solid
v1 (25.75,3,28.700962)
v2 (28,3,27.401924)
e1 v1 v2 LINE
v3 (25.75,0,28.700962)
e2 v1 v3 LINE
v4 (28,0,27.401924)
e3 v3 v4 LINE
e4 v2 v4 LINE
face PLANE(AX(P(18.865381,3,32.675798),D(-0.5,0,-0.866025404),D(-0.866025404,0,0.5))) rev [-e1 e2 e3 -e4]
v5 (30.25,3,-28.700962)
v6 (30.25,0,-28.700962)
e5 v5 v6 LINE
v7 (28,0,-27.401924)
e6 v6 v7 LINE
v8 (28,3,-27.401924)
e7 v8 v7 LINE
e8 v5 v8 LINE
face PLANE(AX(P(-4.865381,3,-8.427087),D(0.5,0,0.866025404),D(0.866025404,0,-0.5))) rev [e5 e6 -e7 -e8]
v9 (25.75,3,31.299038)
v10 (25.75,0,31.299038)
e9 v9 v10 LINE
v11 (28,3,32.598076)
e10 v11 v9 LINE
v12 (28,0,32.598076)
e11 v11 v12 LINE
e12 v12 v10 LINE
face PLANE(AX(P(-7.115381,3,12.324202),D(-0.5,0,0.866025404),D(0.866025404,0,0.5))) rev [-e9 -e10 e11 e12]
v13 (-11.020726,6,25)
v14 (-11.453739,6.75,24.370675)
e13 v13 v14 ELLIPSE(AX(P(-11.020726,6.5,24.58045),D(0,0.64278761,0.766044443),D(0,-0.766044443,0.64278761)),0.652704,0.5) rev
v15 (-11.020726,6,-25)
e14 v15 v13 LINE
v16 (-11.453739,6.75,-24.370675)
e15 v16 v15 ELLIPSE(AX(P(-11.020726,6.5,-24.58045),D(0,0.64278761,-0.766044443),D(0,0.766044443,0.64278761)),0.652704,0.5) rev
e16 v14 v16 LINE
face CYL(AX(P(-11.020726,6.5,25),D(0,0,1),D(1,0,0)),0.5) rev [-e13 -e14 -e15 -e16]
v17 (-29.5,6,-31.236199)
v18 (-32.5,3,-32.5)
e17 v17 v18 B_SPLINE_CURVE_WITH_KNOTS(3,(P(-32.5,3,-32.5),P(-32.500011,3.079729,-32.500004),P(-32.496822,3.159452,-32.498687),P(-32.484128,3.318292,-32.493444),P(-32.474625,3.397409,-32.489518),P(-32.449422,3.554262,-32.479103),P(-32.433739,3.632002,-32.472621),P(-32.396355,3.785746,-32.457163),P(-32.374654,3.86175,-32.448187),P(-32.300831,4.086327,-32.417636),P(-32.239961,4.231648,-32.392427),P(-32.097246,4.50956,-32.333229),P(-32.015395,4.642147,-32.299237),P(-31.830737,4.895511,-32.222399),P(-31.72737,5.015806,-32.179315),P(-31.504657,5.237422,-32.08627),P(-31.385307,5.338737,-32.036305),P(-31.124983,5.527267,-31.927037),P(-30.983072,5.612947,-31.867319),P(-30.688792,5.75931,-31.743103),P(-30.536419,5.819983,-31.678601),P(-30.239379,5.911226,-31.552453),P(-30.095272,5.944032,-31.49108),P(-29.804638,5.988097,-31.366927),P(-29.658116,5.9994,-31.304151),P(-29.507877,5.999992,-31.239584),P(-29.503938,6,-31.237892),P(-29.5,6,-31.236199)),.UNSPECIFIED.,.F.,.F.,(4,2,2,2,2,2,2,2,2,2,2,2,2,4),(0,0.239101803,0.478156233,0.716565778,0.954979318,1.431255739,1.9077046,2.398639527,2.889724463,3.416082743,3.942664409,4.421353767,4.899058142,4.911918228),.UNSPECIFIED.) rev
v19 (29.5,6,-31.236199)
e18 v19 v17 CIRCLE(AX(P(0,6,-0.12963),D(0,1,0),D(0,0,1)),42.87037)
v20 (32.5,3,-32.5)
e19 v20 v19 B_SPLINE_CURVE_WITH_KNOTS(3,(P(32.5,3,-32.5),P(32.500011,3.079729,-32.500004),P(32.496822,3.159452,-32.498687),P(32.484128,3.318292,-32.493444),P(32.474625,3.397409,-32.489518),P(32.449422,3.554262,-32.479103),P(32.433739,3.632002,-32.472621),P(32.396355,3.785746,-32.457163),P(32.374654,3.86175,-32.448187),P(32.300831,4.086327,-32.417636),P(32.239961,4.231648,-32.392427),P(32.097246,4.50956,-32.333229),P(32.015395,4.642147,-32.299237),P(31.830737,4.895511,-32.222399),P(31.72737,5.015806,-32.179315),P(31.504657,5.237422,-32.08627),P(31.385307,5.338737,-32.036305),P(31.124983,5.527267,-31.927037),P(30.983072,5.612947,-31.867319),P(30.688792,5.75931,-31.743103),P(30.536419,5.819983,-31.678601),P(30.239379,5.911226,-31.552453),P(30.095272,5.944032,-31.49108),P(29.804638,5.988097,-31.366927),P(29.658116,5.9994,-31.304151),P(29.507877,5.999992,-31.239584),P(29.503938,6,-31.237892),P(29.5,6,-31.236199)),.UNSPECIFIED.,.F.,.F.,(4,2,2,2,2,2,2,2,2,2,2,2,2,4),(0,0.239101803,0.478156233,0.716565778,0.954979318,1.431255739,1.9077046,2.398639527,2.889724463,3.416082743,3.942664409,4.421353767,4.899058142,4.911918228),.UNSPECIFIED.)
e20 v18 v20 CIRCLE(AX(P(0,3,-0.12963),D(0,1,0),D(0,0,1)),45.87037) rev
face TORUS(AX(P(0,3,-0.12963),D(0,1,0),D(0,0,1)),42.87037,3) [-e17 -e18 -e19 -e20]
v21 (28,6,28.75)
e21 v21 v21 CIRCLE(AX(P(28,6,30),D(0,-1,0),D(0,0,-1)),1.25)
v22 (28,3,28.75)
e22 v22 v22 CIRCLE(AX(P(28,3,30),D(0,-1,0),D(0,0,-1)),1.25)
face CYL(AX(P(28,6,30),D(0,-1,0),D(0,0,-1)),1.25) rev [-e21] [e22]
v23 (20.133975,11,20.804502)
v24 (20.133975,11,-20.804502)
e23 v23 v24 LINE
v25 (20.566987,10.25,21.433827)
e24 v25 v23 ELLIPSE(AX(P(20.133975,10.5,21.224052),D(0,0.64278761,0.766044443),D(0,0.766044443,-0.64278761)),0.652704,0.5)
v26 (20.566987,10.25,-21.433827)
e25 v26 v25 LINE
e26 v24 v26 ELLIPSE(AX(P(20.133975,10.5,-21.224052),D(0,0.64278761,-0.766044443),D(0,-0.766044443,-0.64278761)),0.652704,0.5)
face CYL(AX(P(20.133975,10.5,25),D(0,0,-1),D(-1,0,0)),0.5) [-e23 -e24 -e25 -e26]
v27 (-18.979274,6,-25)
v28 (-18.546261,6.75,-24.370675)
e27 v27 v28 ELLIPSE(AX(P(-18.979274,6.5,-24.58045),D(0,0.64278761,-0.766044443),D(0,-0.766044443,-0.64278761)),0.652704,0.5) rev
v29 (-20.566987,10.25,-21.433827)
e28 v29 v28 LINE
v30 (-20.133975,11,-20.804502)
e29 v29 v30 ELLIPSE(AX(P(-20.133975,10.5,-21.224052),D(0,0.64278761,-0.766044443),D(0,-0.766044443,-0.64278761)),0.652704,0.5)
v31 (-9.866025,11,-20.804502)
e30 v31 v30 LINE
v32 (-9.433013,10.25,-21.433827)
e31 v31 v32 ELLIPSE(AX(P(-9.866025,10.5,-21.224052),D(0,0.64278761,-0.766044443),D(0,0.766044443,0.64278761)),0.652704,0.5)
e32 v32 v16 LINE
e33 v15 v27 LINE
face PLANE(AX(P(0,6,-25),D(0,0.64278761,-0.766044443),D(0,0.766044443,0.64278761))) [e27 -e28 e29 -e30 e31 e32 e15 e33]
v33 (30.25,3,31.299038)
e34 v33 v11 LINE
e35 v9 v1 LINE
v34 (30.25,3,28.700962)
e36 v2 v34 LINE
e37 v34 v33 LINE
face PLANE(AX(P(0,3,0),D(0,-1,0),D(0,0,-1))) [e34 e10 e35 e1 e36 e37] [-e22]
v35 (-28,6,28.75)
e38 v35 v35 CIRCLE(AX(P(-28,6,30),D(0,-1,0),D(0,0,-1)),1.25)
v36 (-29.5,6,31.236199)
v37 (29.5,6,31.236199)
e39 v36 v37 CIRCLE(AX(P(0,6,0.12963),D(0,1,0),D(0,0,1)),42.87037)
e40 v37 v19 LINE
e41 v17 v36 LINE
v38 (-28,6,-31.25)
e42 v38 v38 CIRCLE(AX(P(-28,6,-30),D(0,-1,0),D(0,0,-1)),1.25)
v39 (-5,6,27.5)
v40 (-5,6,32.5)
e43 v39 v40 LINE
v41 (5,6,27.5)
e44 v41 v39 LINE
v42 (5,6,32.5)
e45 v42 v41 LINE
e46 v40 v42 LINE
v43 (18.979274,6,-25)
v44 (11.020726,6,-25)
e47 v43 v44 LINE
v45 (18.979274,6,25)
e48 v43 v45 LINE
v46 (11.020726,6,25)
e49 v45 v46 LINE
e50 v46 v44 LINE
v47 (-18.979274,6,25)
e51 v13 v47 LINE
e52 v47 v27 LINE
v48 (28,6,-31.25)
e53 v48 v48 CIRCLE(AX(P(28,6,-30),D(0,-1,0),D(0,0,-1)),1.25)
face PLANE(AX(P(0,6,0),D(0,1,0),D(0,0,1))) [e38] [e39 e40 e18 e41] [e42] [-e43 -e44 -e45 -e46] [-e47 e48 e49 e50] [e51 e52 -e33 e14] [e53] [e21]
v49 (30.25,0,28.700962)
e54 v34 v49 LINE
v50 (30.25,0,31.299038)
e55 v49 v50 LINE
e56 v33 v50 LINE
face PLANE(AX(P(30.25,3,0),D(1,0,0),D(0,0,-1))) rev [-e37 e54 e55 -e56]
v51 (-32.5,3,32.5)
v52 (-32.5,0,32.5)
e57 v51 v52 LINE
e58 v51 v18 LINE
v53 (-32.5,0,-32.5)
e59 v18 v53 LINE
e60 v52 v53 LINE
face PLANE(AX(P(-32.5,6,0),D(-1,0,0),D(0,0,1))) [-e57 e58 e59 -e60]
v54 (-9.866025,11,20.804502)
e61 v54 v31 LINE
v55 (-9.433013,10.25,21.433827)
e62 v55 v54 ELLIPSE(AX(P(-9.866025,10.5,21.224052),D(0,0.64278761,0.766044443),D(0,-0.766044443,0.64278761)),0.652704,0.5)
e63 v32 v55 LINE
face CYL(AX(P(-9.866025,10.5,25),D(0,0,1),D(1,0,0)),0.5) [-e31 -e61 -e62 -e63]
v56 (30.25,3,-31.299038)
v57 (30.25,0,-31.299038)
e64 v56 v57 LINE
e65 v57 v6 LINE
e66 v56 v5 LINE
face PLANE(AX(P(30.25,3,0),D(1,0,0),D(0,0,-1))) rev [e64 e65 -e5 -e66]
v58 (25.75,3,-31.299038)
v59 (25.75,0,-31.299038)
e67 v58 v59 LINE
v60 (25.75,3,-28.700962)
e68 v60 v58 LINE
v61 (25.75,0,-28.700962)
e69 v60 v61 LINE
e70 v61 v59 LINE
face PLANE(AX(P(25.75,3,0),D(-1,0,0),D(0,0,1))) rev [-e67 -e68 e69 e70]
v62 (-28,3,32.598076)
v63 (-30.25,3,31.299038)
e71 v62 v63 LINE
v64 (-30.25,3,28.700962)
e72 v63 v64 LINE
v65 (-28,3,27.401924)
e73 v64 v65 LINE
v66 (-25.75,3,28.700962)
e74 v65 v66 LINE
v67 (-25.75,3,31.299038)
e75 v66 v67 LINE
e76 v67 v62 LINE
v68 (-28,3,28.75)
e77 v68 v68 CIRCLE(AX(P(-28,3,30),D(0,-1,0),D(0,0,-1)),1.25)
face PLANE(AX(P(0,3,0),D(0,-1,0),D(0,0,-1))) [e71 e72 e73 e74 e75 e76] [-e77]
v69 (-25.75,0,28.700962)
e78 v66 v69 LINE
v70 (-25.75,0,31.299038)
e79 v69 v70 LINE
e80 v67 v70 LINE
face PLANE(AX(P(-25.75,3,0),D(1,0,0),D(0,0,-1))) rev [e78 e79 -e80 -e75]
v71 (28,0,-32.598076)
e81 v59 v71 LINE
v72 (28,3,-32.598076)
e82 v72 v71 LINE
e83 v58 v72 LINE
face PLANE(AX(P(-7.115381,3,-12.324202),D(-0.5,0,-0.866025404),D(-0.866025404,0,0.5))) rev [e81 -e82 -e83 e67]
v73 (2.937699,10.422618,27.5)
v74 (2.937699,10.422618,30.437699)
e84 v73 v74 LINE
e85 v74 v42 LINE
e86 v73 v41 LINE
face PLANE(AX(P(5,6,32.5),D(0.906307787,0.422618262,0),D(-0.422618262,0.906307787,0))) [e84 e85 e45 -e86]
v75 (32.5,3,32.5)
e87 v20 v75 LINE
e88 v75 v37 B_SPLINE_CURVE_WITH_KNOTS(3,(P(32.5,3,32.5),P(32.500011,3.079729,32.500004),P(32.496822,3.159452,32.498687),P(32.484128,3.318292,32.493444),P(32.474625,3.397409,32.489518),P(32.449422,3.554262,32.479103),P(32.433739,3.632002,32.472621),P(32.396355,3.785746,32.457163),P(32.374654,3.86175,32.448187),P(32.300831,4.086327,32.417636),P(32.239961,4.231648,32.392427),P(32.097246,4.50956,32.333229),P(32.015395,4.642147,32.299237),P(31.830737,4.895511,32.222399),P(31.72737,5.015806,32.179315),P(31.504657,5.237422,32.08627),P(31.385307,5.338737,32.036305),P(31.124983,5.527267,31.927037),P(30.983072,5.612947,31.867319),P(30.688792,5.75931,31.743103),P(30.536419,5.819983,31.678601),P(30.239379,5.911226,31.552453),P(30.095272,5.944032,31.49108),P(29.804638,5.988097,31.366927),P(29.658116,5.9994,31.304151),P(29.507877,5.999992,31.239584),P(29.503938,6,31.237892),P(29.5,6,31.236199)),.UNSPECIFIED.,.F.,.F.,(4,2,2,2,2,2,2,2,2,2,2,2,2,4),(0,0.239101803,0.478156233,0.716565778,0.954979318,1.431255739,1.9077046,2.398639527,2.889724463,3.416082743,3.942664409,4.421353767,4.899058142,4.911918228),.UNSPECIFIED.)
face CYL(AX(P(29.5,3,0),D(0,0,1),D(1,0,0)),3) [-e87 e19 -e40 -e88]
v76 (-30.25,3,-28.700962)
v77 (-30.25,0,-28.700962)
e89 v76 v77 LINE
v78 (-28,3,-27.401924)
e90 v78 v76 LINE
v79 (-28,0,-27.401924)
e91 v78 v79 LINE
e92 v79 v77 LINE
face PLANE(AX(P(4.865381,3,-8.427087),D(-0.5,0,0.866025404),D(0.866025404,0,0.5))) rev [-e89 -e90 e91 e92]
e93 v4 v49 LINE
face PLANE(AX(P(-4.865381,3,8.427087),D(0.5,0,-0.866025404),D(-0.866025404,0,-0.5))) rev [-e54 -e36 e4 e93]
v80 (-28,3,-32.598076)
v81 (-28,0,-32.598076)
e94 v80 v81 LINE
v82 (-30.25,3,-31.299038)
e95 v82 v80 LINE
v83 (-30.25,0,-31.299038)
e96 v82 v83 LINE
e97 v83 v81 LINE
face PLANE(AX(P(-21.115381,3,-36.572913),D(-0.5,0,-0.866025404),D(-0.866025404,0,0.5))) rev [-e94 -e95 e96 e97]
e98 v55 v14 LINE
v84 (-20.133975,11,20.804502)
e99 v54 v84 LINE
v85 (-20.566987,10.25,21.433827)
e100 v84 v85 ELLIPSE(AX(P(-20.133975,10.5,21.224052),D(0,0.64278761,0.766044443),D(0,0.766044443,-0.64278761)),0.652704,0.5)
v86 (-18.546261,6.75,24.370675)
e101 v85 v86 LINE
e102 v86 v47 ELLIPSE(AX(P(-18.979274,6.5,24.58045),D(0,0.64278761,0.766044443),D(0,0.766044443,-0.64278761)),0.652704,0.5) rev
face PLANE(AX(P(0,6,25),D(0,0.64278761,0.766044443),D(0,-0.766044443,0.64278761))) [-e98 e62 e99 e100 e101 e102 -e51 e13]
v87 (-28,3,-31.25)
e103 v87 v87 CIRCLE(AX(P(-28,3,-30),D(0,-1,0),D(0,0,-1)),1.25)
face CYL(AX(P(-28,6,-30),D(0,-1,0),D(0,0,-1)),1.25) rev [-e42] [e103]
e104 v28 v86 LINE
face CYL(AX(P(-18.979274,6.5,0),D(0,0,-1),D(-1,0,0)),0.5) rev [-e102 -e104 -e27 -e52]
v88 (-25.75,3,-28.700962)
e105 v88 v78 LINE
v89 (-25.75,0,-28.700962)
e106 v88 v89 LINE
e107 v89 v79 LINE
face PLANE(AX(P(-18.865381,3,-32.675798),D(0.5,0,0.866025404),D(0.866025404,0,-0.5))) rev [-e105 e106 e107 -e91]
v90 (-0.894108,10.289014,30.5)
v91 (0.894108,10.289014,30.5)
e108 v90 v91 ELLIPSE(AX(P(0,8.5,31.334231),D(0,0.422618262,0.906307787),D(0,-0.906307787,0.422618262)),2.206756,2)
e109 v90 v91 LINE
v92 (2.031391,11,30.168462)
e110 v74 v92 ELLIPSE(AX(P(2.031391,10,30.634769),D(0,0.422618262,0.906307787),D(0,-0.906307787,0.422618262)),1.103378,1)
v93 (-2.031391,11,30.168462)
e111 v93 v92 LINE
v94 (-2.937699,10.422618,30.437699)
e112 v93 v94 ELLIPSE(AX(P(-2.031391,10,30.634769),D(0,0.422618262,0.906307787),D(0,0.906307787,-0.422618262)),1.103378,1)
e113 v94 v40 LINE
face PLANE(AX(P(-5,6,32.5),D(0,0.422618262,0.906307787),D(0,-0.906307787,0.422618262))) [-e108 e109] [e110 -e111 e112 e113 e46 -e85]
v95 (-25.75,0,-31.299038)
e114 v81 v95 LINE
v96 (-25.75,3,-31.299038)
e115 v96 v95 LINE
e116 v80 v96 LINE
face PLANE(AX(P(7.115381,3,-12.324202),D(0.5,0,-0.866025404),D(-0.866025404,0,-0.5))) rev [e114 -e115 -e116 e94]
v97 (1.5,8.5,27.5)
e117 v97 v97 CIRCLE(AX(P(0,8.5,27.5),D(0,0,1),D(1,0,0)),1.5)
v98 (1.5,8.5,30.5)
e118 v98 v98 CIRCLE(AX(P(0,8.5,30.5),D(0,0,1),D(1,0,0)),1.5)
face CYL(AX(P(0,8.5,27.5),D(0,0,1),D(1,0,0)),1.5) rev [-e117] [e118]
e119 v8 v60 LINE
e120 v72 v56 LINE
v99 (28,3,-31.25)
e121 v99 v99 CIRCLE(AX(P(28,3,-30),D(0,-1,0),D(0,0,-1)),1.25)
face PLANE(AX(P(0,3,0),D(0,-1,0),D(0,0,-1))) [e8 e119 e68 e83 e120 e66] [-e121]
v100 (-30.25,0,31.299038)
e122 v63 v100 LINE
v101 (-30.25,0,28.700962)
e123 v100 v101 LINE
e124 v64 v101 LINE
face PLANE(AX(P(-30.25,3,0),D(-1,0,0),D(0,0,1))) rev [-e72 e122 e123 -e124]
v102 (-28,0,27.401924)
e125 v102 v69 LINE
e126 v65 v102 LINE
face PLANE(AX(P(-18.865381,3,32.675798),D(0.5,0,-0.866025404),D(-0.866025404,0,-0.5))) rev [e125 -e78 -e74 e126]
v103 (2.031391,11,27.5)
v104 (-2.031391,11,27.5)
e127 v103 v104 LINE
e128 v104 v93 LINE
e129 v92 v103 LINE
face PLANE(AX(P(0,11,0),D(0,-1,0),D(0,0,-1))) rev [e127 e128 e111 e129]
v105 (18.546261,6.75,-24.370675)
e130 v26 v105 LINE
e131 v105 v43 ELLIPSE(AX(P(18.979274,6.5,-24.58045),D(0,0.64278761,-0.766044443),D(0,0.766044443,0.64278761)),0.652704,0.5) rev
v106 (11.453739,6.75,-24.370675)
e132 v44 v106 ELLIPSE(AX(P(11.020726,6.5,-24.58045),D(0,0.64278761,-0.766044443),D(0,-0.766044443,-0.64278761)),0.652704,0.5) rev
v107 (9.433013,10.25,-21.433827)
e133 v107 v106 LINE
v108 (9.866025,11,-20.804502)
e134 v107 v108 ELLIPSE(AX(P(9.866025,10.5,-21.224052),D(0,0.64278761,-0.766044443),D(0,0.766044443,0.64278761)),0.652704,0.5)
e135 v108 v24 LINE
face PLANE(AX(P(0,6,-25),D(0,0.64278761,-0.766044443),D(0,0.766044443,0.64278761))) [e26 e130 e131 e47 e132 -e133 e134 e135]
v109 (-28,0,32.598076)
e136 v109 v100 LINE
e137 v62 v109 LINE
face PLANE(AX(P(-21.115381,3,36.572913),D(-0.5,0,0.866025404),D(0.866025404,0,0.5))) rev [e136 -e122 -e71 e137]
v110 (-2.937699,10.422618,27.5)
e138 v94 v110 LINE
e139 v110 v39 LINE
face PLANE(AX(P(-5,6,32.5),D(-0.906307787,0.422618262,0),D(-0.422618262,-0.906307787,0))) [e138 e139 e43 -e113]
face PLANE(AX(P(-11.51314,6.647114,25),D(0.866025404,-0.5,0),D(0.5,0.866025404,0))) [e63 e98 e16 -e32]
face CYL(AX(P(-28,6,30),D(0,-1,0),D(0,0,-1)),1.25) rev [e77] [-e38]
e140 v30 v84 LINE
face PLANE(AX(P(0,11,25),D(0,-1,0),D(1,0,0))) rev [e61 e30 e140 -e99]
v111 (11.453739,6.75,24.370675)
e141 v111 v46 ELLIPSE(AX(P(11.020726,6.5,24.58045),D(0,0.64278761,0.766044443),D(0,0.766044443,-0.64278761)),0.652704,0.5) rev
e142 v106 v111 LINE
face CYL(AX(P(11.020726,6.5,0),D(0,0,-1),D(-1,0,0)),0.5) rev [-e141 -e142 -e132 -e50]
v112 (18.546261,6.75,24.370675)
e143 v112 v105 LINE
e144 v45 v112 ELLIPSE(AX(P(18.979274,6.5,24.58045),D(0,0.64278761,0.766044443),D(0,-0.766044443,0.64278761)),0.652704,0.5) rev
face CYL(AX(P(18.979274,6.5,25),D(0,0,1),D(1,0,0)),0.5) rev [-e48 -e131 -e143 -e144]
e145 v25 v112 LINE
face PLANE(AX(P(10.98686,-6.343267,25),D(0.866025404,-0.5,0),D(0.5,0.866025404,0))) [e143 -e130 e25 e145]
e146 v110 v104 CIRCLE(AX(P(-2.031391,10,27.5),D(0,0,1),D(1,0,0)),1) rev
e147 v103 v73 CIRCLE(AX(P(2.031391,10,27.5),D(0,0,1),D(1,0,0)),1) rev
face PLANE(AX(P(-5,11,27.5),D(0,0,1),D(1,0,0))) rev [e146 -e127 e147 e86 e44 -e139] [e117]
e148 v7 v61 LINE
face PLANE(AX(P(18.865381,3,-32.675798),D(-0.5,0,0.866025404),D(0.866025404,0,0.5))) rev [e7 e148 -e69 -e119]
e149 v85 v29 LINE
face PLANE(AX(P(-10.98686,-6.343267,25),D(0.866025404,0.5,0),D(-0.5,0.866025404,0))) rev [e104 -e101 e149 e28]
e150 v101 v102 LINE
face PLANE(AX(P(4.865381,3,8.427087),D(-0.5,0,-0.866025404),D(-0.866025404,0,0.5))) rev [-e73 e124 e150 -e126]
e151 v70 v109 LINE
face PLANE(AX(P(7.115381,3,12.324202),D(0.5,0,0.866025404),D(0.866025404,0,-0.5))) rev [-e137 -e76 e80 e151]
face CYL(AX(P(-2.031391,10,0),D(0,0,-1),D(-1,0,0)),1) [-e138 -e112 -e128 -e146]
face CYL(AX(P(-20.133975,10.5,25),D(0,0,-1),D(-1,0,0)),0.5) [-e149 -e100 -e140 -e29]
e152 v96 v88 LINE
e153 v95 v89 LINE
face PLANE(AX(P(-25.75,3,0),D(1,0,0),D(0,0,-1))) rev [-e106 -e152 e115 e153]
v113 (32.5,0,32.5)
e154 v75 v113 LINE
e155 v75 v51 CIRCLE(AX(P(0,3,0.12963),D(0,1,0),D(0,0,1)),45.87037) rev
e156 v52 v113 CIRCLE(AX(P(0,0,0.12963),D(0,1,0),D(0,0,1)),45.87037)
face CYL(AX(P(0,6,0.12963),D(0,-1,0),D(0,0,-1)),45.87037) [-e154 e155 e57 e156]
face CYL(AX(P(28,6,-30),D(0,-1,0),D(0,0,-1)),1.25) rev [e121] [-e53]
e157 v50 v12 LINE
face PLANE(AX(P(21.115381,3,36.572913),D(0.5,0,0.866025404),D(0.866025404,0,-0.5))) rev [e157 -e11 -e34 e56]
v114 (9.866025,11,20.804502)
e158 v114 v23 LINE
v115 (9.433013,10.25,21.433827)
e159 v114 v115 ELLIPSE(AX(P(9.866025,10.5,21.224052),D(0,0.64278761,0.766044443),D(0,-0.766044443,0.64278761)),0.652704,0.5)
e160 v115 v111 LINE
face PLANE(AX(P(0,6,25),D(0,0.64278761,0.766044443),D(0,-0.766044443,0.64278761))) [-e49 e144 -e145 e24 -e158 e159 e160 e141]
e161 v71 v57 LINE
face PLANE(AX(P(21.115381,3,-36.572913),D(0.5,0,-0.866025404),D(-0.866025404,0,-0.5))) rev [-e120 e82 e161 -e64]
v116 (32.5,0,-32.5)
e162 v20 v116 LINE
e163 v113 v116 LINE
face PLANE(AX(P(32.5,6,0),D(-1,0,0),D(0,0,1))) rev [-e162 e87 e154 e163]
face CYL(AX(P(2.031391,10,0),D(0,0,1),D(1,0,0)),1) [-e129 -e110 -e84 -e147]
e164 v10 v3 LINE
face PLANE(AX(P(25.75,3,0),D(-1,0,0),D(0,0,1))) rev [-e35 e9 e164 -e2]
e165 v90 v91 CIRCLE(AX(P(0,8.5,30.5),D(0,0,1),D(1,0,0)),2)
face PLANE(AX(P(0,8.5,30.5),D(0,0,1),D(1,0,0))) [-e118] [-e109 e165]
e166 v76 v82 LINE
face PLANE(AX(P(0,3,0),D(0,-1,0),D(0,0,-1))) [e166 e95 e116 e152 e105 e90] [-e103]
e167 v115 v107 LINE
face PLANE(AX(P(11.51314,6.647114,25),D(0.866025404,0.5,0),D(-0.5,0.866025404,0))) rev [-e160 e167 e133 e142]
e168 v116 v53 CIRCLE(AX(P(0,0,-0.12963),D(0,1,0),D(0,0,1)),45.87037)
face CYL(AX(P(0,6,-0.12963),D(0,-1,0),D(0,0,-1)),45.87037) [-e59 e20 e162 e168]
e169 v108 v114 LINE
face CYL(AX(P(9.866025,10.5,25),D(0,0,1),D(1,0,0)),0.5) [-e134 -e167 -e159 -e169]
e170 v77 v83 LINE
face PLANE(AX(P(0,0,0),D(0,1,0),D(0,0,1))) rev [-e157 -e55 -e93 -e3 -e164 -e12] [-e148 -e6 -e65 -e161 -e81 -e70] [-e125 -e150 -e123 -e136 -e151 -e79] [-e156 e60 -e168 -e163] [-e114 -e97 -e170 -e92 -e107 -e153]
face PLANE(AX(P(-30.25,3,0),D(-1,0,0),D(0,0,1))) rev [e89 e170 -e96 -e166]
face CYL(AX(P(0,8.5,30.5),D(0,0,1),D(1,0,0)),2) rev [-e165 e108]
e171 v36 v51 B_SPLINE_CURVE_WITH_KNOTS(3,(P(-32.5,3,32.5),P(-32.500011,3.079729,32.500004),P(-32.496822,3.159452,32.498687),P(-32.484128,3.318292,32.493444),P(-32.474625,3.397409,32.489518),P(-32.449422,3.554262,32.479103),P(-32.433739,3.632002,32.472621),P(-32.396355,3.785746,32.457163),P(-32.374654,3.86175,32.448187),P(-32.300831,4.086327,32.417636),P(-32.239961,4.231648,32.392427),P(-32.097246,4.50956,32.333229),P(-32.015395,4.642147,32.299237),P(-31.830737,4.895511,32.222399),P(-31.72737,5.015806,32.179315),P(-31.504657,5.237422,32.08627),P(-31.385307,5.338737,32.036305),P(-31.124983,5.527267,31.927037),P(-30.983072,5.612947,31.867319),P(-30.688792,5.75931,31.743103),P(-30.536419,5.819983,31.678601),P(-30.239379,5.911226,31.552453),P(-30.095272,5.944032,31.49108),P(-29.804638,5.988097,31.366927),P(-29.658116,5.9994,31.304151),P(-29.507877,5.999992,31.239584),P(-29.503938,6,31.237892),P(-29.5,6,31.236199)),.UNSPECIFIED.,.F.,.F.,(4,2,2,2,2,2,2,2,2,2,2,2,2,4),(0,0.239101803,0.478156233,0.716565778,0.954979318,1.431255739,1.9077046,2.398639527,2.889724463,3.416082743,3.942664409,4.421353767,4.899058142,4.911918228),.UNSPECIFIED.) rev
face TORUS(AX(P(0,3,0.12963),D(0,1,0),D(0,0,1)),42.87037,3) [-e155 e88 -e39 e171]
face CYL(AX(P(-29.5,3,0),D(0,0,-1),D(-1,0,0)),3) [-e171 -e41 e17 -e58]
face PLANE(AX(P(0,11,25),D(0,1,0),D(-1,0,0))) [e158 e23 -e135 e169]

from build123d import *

# Parameters (mm, degrees)
EXTRUDE_1_DEPTH     = 6
CUT_EXTRUDE_1_DEPTH = 3
SKETCH_4_R          = 1.25
CUT_EXTRUDE_3_DEPTH = 57.402570863
EXTRUDE_2_DEPTH     = 25
DRAFT_1_ANGLE       = 40
FILLET_1_R          = 0.5
SKETCH_6_W          = 10
SKETCH_6_H          = 5
EXTRUDE_3_DEPTH     = 5
DRAFT_3_ANGLE       = 25
FILLET_2_R          = 1
SKETCH_7_R          = 1.5
CUT_EXTRUDE_4_DEPTH = 5
SKETCH_8_R          = 2
SKETCH_8_R_2        = 1.5
CUT_EXTRUDE_5_DEPTH = 2
DRAFT_START         = 31.990712649
DRAFT_5_DEPTH       = 3.009287351
FILLET_3_R          = 3


with BuildPart() as part:
    # Эскиз1 → Бобышка-Вытянуть1 (new body)
    with BuildSketch(Plane(origin=(0, 0, 0), x_dir=(1, 0, 0), z_dir=(0, 1, 0))):
        with BuildLine():
            Line((-32.5, -32.5), (-32.5, 32.5))
            ThreePointArc((-32.5, 32.5), (0, 46), (32.5, 32.5))
            Line((32.5, 32.5), (32.5, -32.5))
            ThreePointArc((32.5, -32.5), (0, -46), (-32.5, -32.5))
        make_face()
    extrude(amount=EXTRUDE_1_DEPTH)

    # Эскиз2 → Вырез-Вытянуть1 (cut)
    with BuildSketch(Plane.XZ):
        Polygon((28, -32.598076211), (30.25, -31.299038106), (30.25, -28.700961894), (28, -27.401923789), (25.75, -28.700961894), (25.75, -31.299038106), align=None)
        Polygon((25.75, 31.299038106), (25.75, 28.700961894), (28, 27.401923789), (30.25, 28.700961894), (30.25, 31.299038106), (28, 32.598076211), align=None)
        Polygon((-28, 27.401923789), (-25.75, 28.700961894), (-25.75, 31.299038106), (-28, 32.598076211), (-30.25, 31.299038106), (-30.25, 28.700961894), align=None)
        Polygon((-28, -32.598076211), (-25.75, -31.299038106), (-25.75, -28.700961894), (-28, -27.401923789), (-30.25, -28.700961894), (-30.25, -31.299038106), align=None)
    extrude(amount=-CUT_EXTRUDE_1_DEPTH, mode=Mode.SUBTRACT)

    # Эскиз4 → Вырез-Вытянуть3 (cut, through all)
    with BuildSketch(Plane.XZ.offset(-3)):
        with Locations(Location((28, 30, 0), (0, 0, 270))):
            Circle(SKETCH_4_R)
        with Locations(Location((-28, 30, 0), (0, 0, 270))):
            Circle(SKETCH_4_R)
        with Locations(Location((-28, -30, 0), (0, 0, 270))):
            Circle(SKETCH_4_R)
        with Locations(Location((28, -30, 0), (0, 0, 270))):
            Circle(SKETCH_4_R)
    extrude(amount=-CUT_EXTRUDE_3_DEPTH, mode=Mode.SUBTRACT)

    # Эскиз5 → Бобышка-Вытянуть2 (add, symmetric)
    with BuildSketch(Plane.XY):
        Polygon((-18.113248654, 6), (-11.886751346, 6), (-9, 11), (-21, 11), align=None)
        Polygon((21, 11), (9, 11), (11.886751346, 6), (18.113248654, 6), align=None)
    extrude(amount=EXTRUDE_2_DEPTH, both=True)

    # Уклон1
    draft_1_faces = [part.faces().sort_by_distance(p)[0] for p in [
        (15, 8.763970206, -25),
        (15, 8.763970206, 25),
        (-15, 8.763970206, -25),
        (-15, 8.763970206, 25),
    ]]
    draft(draft_1_faces, Plane.ZX.offset(6), DRAFT_1_ANGLE)

    # Скругление1
    fillet_1_edges = [part.edges().sort_by_distance(p)[0] for p in [
        (-9, 11, 0),
        (-21, 11, 0),
        (-18.113248654, 6, 0),
        (-11.886751346, 6, 0),
        (11.886751346, 6, 0),
        (18.113248654, 6, 0),
        (21, 11, 0),
        (9, 11, 0),
    ]]
    fillet(fillet_1_edges, radius=FILLET_1_R)

    # Эскиз6 → Бобышка-Вытянуть3 (add)
    with BuildSketch(Plane(origin=(0, 6, 0), x_dir=(1, 0, 0), z_dir=(0, 1, 0))):
        with Locations((0, -30)):
            Rectangle(SKETCH_6_W, SKETCH_6_H)
    extrude(amount=EXTRUDE_3_DEPTH)

    # Уклон3
    draft_3_faces = [part.faces().sort_by_distance(p)[0] for p in [
        (5, 8.5, 30),
        (-5, 8.5, 30),
    ]]
    draft(draft_3_faces, Plane.ZX.offset(6), DRAFT_3_ANGLE)

    # Скругление2
    fillet_2_edges = [part.edges().sort_by_distance(p)[0] for p in [
        (2.668461709, 11, 30),
        (-2.668461709, 11, 30),
    ]]
    fillet(fillet_2_edges, radius=FILLET_2_R)

    # Эскиз7 → Вырез-Вытянуть4 (cut)
    with BuildSketch(Plane.XY.offset(32.5)):
        with Locations((0, 8.5)):
            Circle(SKETCH_7_R)
    extrude(amount=-CUT_EXTRUDE_4_DEPTH, mode=Mode.SUBTRACT)

    # Эскиз8 → Вырез-Вытянуть5 (cut)
    with BuildSketch(Plane.XY.offset(32.5)):
        with Locations((0, 8.5)):
            Circle(SKETCH_8_R)
        with Locations((0, 8.5)):
            Circle(SKETCH_8_R_2, mode=Mode.SUBTRACT)
    extrude(amount=-CUT_EXTRUDE_5_DEPTH, mode=Mode.SUBTRACT)

    # Уклон5: read off the stored shape, not the designer's step
    # Уклон5 outline → Уклон5 (cut)
    with BuildSketch(Plane(origin=(0, 0, 0), x_dir=(1, 0, 0), z_dir=(0, 0.4226182617406999, 0.9063077870366498)).offset(DRAFT_START)):
        with BuildLine():
            Line((-5, -8.297246784), (5, -8.297246784))
            Line((5, -8.297246784), (2.937699235, -3.41742745))
            add(Edge.make_bspline(
                [(2.937699235, -3.41742745), (2.668461709, -2.78035719), (2.031391448, -2.78035719)],
                knots=[2.00712864, 2.00712864, 2.00712864, 3.141592654, 3.141592654, 3.141592654], degree=2, weights=[1, 0.843391446, 1]))
            Line((2.031391448, -2.78035719), (-2.031391448, -2.78035719))
            add(Edge.make_bspline(
                [(-2.031391448, -2.78035719), (-2.668461709, -2.78035719), (-2.937699235, -3.41742745)],
                knots=[0, 0, 0, 1.134464014, 1.134464014, 1.134464014], degree=2, weights=[1, 0.843391446, 1]))
            Line((-2.937699235, -3.41742745), (-5, -8.297246784))
        make_face()
    extrude(amount=DRAFT_5_DEPTH, mode=Mode.SUBTRACT)

    # Скругление3
    fillet_3_edges = [part.edges().sort_by_distance(p)[0] for p in [
        (0, 6, 46),
        (32.5, 6, 0),
        (0, 6, -46),
        (-32.5, 6, 0),
    ]]
    fillet(fillet_3_edges, radius=FILLET_3_R)


solid = part.part
